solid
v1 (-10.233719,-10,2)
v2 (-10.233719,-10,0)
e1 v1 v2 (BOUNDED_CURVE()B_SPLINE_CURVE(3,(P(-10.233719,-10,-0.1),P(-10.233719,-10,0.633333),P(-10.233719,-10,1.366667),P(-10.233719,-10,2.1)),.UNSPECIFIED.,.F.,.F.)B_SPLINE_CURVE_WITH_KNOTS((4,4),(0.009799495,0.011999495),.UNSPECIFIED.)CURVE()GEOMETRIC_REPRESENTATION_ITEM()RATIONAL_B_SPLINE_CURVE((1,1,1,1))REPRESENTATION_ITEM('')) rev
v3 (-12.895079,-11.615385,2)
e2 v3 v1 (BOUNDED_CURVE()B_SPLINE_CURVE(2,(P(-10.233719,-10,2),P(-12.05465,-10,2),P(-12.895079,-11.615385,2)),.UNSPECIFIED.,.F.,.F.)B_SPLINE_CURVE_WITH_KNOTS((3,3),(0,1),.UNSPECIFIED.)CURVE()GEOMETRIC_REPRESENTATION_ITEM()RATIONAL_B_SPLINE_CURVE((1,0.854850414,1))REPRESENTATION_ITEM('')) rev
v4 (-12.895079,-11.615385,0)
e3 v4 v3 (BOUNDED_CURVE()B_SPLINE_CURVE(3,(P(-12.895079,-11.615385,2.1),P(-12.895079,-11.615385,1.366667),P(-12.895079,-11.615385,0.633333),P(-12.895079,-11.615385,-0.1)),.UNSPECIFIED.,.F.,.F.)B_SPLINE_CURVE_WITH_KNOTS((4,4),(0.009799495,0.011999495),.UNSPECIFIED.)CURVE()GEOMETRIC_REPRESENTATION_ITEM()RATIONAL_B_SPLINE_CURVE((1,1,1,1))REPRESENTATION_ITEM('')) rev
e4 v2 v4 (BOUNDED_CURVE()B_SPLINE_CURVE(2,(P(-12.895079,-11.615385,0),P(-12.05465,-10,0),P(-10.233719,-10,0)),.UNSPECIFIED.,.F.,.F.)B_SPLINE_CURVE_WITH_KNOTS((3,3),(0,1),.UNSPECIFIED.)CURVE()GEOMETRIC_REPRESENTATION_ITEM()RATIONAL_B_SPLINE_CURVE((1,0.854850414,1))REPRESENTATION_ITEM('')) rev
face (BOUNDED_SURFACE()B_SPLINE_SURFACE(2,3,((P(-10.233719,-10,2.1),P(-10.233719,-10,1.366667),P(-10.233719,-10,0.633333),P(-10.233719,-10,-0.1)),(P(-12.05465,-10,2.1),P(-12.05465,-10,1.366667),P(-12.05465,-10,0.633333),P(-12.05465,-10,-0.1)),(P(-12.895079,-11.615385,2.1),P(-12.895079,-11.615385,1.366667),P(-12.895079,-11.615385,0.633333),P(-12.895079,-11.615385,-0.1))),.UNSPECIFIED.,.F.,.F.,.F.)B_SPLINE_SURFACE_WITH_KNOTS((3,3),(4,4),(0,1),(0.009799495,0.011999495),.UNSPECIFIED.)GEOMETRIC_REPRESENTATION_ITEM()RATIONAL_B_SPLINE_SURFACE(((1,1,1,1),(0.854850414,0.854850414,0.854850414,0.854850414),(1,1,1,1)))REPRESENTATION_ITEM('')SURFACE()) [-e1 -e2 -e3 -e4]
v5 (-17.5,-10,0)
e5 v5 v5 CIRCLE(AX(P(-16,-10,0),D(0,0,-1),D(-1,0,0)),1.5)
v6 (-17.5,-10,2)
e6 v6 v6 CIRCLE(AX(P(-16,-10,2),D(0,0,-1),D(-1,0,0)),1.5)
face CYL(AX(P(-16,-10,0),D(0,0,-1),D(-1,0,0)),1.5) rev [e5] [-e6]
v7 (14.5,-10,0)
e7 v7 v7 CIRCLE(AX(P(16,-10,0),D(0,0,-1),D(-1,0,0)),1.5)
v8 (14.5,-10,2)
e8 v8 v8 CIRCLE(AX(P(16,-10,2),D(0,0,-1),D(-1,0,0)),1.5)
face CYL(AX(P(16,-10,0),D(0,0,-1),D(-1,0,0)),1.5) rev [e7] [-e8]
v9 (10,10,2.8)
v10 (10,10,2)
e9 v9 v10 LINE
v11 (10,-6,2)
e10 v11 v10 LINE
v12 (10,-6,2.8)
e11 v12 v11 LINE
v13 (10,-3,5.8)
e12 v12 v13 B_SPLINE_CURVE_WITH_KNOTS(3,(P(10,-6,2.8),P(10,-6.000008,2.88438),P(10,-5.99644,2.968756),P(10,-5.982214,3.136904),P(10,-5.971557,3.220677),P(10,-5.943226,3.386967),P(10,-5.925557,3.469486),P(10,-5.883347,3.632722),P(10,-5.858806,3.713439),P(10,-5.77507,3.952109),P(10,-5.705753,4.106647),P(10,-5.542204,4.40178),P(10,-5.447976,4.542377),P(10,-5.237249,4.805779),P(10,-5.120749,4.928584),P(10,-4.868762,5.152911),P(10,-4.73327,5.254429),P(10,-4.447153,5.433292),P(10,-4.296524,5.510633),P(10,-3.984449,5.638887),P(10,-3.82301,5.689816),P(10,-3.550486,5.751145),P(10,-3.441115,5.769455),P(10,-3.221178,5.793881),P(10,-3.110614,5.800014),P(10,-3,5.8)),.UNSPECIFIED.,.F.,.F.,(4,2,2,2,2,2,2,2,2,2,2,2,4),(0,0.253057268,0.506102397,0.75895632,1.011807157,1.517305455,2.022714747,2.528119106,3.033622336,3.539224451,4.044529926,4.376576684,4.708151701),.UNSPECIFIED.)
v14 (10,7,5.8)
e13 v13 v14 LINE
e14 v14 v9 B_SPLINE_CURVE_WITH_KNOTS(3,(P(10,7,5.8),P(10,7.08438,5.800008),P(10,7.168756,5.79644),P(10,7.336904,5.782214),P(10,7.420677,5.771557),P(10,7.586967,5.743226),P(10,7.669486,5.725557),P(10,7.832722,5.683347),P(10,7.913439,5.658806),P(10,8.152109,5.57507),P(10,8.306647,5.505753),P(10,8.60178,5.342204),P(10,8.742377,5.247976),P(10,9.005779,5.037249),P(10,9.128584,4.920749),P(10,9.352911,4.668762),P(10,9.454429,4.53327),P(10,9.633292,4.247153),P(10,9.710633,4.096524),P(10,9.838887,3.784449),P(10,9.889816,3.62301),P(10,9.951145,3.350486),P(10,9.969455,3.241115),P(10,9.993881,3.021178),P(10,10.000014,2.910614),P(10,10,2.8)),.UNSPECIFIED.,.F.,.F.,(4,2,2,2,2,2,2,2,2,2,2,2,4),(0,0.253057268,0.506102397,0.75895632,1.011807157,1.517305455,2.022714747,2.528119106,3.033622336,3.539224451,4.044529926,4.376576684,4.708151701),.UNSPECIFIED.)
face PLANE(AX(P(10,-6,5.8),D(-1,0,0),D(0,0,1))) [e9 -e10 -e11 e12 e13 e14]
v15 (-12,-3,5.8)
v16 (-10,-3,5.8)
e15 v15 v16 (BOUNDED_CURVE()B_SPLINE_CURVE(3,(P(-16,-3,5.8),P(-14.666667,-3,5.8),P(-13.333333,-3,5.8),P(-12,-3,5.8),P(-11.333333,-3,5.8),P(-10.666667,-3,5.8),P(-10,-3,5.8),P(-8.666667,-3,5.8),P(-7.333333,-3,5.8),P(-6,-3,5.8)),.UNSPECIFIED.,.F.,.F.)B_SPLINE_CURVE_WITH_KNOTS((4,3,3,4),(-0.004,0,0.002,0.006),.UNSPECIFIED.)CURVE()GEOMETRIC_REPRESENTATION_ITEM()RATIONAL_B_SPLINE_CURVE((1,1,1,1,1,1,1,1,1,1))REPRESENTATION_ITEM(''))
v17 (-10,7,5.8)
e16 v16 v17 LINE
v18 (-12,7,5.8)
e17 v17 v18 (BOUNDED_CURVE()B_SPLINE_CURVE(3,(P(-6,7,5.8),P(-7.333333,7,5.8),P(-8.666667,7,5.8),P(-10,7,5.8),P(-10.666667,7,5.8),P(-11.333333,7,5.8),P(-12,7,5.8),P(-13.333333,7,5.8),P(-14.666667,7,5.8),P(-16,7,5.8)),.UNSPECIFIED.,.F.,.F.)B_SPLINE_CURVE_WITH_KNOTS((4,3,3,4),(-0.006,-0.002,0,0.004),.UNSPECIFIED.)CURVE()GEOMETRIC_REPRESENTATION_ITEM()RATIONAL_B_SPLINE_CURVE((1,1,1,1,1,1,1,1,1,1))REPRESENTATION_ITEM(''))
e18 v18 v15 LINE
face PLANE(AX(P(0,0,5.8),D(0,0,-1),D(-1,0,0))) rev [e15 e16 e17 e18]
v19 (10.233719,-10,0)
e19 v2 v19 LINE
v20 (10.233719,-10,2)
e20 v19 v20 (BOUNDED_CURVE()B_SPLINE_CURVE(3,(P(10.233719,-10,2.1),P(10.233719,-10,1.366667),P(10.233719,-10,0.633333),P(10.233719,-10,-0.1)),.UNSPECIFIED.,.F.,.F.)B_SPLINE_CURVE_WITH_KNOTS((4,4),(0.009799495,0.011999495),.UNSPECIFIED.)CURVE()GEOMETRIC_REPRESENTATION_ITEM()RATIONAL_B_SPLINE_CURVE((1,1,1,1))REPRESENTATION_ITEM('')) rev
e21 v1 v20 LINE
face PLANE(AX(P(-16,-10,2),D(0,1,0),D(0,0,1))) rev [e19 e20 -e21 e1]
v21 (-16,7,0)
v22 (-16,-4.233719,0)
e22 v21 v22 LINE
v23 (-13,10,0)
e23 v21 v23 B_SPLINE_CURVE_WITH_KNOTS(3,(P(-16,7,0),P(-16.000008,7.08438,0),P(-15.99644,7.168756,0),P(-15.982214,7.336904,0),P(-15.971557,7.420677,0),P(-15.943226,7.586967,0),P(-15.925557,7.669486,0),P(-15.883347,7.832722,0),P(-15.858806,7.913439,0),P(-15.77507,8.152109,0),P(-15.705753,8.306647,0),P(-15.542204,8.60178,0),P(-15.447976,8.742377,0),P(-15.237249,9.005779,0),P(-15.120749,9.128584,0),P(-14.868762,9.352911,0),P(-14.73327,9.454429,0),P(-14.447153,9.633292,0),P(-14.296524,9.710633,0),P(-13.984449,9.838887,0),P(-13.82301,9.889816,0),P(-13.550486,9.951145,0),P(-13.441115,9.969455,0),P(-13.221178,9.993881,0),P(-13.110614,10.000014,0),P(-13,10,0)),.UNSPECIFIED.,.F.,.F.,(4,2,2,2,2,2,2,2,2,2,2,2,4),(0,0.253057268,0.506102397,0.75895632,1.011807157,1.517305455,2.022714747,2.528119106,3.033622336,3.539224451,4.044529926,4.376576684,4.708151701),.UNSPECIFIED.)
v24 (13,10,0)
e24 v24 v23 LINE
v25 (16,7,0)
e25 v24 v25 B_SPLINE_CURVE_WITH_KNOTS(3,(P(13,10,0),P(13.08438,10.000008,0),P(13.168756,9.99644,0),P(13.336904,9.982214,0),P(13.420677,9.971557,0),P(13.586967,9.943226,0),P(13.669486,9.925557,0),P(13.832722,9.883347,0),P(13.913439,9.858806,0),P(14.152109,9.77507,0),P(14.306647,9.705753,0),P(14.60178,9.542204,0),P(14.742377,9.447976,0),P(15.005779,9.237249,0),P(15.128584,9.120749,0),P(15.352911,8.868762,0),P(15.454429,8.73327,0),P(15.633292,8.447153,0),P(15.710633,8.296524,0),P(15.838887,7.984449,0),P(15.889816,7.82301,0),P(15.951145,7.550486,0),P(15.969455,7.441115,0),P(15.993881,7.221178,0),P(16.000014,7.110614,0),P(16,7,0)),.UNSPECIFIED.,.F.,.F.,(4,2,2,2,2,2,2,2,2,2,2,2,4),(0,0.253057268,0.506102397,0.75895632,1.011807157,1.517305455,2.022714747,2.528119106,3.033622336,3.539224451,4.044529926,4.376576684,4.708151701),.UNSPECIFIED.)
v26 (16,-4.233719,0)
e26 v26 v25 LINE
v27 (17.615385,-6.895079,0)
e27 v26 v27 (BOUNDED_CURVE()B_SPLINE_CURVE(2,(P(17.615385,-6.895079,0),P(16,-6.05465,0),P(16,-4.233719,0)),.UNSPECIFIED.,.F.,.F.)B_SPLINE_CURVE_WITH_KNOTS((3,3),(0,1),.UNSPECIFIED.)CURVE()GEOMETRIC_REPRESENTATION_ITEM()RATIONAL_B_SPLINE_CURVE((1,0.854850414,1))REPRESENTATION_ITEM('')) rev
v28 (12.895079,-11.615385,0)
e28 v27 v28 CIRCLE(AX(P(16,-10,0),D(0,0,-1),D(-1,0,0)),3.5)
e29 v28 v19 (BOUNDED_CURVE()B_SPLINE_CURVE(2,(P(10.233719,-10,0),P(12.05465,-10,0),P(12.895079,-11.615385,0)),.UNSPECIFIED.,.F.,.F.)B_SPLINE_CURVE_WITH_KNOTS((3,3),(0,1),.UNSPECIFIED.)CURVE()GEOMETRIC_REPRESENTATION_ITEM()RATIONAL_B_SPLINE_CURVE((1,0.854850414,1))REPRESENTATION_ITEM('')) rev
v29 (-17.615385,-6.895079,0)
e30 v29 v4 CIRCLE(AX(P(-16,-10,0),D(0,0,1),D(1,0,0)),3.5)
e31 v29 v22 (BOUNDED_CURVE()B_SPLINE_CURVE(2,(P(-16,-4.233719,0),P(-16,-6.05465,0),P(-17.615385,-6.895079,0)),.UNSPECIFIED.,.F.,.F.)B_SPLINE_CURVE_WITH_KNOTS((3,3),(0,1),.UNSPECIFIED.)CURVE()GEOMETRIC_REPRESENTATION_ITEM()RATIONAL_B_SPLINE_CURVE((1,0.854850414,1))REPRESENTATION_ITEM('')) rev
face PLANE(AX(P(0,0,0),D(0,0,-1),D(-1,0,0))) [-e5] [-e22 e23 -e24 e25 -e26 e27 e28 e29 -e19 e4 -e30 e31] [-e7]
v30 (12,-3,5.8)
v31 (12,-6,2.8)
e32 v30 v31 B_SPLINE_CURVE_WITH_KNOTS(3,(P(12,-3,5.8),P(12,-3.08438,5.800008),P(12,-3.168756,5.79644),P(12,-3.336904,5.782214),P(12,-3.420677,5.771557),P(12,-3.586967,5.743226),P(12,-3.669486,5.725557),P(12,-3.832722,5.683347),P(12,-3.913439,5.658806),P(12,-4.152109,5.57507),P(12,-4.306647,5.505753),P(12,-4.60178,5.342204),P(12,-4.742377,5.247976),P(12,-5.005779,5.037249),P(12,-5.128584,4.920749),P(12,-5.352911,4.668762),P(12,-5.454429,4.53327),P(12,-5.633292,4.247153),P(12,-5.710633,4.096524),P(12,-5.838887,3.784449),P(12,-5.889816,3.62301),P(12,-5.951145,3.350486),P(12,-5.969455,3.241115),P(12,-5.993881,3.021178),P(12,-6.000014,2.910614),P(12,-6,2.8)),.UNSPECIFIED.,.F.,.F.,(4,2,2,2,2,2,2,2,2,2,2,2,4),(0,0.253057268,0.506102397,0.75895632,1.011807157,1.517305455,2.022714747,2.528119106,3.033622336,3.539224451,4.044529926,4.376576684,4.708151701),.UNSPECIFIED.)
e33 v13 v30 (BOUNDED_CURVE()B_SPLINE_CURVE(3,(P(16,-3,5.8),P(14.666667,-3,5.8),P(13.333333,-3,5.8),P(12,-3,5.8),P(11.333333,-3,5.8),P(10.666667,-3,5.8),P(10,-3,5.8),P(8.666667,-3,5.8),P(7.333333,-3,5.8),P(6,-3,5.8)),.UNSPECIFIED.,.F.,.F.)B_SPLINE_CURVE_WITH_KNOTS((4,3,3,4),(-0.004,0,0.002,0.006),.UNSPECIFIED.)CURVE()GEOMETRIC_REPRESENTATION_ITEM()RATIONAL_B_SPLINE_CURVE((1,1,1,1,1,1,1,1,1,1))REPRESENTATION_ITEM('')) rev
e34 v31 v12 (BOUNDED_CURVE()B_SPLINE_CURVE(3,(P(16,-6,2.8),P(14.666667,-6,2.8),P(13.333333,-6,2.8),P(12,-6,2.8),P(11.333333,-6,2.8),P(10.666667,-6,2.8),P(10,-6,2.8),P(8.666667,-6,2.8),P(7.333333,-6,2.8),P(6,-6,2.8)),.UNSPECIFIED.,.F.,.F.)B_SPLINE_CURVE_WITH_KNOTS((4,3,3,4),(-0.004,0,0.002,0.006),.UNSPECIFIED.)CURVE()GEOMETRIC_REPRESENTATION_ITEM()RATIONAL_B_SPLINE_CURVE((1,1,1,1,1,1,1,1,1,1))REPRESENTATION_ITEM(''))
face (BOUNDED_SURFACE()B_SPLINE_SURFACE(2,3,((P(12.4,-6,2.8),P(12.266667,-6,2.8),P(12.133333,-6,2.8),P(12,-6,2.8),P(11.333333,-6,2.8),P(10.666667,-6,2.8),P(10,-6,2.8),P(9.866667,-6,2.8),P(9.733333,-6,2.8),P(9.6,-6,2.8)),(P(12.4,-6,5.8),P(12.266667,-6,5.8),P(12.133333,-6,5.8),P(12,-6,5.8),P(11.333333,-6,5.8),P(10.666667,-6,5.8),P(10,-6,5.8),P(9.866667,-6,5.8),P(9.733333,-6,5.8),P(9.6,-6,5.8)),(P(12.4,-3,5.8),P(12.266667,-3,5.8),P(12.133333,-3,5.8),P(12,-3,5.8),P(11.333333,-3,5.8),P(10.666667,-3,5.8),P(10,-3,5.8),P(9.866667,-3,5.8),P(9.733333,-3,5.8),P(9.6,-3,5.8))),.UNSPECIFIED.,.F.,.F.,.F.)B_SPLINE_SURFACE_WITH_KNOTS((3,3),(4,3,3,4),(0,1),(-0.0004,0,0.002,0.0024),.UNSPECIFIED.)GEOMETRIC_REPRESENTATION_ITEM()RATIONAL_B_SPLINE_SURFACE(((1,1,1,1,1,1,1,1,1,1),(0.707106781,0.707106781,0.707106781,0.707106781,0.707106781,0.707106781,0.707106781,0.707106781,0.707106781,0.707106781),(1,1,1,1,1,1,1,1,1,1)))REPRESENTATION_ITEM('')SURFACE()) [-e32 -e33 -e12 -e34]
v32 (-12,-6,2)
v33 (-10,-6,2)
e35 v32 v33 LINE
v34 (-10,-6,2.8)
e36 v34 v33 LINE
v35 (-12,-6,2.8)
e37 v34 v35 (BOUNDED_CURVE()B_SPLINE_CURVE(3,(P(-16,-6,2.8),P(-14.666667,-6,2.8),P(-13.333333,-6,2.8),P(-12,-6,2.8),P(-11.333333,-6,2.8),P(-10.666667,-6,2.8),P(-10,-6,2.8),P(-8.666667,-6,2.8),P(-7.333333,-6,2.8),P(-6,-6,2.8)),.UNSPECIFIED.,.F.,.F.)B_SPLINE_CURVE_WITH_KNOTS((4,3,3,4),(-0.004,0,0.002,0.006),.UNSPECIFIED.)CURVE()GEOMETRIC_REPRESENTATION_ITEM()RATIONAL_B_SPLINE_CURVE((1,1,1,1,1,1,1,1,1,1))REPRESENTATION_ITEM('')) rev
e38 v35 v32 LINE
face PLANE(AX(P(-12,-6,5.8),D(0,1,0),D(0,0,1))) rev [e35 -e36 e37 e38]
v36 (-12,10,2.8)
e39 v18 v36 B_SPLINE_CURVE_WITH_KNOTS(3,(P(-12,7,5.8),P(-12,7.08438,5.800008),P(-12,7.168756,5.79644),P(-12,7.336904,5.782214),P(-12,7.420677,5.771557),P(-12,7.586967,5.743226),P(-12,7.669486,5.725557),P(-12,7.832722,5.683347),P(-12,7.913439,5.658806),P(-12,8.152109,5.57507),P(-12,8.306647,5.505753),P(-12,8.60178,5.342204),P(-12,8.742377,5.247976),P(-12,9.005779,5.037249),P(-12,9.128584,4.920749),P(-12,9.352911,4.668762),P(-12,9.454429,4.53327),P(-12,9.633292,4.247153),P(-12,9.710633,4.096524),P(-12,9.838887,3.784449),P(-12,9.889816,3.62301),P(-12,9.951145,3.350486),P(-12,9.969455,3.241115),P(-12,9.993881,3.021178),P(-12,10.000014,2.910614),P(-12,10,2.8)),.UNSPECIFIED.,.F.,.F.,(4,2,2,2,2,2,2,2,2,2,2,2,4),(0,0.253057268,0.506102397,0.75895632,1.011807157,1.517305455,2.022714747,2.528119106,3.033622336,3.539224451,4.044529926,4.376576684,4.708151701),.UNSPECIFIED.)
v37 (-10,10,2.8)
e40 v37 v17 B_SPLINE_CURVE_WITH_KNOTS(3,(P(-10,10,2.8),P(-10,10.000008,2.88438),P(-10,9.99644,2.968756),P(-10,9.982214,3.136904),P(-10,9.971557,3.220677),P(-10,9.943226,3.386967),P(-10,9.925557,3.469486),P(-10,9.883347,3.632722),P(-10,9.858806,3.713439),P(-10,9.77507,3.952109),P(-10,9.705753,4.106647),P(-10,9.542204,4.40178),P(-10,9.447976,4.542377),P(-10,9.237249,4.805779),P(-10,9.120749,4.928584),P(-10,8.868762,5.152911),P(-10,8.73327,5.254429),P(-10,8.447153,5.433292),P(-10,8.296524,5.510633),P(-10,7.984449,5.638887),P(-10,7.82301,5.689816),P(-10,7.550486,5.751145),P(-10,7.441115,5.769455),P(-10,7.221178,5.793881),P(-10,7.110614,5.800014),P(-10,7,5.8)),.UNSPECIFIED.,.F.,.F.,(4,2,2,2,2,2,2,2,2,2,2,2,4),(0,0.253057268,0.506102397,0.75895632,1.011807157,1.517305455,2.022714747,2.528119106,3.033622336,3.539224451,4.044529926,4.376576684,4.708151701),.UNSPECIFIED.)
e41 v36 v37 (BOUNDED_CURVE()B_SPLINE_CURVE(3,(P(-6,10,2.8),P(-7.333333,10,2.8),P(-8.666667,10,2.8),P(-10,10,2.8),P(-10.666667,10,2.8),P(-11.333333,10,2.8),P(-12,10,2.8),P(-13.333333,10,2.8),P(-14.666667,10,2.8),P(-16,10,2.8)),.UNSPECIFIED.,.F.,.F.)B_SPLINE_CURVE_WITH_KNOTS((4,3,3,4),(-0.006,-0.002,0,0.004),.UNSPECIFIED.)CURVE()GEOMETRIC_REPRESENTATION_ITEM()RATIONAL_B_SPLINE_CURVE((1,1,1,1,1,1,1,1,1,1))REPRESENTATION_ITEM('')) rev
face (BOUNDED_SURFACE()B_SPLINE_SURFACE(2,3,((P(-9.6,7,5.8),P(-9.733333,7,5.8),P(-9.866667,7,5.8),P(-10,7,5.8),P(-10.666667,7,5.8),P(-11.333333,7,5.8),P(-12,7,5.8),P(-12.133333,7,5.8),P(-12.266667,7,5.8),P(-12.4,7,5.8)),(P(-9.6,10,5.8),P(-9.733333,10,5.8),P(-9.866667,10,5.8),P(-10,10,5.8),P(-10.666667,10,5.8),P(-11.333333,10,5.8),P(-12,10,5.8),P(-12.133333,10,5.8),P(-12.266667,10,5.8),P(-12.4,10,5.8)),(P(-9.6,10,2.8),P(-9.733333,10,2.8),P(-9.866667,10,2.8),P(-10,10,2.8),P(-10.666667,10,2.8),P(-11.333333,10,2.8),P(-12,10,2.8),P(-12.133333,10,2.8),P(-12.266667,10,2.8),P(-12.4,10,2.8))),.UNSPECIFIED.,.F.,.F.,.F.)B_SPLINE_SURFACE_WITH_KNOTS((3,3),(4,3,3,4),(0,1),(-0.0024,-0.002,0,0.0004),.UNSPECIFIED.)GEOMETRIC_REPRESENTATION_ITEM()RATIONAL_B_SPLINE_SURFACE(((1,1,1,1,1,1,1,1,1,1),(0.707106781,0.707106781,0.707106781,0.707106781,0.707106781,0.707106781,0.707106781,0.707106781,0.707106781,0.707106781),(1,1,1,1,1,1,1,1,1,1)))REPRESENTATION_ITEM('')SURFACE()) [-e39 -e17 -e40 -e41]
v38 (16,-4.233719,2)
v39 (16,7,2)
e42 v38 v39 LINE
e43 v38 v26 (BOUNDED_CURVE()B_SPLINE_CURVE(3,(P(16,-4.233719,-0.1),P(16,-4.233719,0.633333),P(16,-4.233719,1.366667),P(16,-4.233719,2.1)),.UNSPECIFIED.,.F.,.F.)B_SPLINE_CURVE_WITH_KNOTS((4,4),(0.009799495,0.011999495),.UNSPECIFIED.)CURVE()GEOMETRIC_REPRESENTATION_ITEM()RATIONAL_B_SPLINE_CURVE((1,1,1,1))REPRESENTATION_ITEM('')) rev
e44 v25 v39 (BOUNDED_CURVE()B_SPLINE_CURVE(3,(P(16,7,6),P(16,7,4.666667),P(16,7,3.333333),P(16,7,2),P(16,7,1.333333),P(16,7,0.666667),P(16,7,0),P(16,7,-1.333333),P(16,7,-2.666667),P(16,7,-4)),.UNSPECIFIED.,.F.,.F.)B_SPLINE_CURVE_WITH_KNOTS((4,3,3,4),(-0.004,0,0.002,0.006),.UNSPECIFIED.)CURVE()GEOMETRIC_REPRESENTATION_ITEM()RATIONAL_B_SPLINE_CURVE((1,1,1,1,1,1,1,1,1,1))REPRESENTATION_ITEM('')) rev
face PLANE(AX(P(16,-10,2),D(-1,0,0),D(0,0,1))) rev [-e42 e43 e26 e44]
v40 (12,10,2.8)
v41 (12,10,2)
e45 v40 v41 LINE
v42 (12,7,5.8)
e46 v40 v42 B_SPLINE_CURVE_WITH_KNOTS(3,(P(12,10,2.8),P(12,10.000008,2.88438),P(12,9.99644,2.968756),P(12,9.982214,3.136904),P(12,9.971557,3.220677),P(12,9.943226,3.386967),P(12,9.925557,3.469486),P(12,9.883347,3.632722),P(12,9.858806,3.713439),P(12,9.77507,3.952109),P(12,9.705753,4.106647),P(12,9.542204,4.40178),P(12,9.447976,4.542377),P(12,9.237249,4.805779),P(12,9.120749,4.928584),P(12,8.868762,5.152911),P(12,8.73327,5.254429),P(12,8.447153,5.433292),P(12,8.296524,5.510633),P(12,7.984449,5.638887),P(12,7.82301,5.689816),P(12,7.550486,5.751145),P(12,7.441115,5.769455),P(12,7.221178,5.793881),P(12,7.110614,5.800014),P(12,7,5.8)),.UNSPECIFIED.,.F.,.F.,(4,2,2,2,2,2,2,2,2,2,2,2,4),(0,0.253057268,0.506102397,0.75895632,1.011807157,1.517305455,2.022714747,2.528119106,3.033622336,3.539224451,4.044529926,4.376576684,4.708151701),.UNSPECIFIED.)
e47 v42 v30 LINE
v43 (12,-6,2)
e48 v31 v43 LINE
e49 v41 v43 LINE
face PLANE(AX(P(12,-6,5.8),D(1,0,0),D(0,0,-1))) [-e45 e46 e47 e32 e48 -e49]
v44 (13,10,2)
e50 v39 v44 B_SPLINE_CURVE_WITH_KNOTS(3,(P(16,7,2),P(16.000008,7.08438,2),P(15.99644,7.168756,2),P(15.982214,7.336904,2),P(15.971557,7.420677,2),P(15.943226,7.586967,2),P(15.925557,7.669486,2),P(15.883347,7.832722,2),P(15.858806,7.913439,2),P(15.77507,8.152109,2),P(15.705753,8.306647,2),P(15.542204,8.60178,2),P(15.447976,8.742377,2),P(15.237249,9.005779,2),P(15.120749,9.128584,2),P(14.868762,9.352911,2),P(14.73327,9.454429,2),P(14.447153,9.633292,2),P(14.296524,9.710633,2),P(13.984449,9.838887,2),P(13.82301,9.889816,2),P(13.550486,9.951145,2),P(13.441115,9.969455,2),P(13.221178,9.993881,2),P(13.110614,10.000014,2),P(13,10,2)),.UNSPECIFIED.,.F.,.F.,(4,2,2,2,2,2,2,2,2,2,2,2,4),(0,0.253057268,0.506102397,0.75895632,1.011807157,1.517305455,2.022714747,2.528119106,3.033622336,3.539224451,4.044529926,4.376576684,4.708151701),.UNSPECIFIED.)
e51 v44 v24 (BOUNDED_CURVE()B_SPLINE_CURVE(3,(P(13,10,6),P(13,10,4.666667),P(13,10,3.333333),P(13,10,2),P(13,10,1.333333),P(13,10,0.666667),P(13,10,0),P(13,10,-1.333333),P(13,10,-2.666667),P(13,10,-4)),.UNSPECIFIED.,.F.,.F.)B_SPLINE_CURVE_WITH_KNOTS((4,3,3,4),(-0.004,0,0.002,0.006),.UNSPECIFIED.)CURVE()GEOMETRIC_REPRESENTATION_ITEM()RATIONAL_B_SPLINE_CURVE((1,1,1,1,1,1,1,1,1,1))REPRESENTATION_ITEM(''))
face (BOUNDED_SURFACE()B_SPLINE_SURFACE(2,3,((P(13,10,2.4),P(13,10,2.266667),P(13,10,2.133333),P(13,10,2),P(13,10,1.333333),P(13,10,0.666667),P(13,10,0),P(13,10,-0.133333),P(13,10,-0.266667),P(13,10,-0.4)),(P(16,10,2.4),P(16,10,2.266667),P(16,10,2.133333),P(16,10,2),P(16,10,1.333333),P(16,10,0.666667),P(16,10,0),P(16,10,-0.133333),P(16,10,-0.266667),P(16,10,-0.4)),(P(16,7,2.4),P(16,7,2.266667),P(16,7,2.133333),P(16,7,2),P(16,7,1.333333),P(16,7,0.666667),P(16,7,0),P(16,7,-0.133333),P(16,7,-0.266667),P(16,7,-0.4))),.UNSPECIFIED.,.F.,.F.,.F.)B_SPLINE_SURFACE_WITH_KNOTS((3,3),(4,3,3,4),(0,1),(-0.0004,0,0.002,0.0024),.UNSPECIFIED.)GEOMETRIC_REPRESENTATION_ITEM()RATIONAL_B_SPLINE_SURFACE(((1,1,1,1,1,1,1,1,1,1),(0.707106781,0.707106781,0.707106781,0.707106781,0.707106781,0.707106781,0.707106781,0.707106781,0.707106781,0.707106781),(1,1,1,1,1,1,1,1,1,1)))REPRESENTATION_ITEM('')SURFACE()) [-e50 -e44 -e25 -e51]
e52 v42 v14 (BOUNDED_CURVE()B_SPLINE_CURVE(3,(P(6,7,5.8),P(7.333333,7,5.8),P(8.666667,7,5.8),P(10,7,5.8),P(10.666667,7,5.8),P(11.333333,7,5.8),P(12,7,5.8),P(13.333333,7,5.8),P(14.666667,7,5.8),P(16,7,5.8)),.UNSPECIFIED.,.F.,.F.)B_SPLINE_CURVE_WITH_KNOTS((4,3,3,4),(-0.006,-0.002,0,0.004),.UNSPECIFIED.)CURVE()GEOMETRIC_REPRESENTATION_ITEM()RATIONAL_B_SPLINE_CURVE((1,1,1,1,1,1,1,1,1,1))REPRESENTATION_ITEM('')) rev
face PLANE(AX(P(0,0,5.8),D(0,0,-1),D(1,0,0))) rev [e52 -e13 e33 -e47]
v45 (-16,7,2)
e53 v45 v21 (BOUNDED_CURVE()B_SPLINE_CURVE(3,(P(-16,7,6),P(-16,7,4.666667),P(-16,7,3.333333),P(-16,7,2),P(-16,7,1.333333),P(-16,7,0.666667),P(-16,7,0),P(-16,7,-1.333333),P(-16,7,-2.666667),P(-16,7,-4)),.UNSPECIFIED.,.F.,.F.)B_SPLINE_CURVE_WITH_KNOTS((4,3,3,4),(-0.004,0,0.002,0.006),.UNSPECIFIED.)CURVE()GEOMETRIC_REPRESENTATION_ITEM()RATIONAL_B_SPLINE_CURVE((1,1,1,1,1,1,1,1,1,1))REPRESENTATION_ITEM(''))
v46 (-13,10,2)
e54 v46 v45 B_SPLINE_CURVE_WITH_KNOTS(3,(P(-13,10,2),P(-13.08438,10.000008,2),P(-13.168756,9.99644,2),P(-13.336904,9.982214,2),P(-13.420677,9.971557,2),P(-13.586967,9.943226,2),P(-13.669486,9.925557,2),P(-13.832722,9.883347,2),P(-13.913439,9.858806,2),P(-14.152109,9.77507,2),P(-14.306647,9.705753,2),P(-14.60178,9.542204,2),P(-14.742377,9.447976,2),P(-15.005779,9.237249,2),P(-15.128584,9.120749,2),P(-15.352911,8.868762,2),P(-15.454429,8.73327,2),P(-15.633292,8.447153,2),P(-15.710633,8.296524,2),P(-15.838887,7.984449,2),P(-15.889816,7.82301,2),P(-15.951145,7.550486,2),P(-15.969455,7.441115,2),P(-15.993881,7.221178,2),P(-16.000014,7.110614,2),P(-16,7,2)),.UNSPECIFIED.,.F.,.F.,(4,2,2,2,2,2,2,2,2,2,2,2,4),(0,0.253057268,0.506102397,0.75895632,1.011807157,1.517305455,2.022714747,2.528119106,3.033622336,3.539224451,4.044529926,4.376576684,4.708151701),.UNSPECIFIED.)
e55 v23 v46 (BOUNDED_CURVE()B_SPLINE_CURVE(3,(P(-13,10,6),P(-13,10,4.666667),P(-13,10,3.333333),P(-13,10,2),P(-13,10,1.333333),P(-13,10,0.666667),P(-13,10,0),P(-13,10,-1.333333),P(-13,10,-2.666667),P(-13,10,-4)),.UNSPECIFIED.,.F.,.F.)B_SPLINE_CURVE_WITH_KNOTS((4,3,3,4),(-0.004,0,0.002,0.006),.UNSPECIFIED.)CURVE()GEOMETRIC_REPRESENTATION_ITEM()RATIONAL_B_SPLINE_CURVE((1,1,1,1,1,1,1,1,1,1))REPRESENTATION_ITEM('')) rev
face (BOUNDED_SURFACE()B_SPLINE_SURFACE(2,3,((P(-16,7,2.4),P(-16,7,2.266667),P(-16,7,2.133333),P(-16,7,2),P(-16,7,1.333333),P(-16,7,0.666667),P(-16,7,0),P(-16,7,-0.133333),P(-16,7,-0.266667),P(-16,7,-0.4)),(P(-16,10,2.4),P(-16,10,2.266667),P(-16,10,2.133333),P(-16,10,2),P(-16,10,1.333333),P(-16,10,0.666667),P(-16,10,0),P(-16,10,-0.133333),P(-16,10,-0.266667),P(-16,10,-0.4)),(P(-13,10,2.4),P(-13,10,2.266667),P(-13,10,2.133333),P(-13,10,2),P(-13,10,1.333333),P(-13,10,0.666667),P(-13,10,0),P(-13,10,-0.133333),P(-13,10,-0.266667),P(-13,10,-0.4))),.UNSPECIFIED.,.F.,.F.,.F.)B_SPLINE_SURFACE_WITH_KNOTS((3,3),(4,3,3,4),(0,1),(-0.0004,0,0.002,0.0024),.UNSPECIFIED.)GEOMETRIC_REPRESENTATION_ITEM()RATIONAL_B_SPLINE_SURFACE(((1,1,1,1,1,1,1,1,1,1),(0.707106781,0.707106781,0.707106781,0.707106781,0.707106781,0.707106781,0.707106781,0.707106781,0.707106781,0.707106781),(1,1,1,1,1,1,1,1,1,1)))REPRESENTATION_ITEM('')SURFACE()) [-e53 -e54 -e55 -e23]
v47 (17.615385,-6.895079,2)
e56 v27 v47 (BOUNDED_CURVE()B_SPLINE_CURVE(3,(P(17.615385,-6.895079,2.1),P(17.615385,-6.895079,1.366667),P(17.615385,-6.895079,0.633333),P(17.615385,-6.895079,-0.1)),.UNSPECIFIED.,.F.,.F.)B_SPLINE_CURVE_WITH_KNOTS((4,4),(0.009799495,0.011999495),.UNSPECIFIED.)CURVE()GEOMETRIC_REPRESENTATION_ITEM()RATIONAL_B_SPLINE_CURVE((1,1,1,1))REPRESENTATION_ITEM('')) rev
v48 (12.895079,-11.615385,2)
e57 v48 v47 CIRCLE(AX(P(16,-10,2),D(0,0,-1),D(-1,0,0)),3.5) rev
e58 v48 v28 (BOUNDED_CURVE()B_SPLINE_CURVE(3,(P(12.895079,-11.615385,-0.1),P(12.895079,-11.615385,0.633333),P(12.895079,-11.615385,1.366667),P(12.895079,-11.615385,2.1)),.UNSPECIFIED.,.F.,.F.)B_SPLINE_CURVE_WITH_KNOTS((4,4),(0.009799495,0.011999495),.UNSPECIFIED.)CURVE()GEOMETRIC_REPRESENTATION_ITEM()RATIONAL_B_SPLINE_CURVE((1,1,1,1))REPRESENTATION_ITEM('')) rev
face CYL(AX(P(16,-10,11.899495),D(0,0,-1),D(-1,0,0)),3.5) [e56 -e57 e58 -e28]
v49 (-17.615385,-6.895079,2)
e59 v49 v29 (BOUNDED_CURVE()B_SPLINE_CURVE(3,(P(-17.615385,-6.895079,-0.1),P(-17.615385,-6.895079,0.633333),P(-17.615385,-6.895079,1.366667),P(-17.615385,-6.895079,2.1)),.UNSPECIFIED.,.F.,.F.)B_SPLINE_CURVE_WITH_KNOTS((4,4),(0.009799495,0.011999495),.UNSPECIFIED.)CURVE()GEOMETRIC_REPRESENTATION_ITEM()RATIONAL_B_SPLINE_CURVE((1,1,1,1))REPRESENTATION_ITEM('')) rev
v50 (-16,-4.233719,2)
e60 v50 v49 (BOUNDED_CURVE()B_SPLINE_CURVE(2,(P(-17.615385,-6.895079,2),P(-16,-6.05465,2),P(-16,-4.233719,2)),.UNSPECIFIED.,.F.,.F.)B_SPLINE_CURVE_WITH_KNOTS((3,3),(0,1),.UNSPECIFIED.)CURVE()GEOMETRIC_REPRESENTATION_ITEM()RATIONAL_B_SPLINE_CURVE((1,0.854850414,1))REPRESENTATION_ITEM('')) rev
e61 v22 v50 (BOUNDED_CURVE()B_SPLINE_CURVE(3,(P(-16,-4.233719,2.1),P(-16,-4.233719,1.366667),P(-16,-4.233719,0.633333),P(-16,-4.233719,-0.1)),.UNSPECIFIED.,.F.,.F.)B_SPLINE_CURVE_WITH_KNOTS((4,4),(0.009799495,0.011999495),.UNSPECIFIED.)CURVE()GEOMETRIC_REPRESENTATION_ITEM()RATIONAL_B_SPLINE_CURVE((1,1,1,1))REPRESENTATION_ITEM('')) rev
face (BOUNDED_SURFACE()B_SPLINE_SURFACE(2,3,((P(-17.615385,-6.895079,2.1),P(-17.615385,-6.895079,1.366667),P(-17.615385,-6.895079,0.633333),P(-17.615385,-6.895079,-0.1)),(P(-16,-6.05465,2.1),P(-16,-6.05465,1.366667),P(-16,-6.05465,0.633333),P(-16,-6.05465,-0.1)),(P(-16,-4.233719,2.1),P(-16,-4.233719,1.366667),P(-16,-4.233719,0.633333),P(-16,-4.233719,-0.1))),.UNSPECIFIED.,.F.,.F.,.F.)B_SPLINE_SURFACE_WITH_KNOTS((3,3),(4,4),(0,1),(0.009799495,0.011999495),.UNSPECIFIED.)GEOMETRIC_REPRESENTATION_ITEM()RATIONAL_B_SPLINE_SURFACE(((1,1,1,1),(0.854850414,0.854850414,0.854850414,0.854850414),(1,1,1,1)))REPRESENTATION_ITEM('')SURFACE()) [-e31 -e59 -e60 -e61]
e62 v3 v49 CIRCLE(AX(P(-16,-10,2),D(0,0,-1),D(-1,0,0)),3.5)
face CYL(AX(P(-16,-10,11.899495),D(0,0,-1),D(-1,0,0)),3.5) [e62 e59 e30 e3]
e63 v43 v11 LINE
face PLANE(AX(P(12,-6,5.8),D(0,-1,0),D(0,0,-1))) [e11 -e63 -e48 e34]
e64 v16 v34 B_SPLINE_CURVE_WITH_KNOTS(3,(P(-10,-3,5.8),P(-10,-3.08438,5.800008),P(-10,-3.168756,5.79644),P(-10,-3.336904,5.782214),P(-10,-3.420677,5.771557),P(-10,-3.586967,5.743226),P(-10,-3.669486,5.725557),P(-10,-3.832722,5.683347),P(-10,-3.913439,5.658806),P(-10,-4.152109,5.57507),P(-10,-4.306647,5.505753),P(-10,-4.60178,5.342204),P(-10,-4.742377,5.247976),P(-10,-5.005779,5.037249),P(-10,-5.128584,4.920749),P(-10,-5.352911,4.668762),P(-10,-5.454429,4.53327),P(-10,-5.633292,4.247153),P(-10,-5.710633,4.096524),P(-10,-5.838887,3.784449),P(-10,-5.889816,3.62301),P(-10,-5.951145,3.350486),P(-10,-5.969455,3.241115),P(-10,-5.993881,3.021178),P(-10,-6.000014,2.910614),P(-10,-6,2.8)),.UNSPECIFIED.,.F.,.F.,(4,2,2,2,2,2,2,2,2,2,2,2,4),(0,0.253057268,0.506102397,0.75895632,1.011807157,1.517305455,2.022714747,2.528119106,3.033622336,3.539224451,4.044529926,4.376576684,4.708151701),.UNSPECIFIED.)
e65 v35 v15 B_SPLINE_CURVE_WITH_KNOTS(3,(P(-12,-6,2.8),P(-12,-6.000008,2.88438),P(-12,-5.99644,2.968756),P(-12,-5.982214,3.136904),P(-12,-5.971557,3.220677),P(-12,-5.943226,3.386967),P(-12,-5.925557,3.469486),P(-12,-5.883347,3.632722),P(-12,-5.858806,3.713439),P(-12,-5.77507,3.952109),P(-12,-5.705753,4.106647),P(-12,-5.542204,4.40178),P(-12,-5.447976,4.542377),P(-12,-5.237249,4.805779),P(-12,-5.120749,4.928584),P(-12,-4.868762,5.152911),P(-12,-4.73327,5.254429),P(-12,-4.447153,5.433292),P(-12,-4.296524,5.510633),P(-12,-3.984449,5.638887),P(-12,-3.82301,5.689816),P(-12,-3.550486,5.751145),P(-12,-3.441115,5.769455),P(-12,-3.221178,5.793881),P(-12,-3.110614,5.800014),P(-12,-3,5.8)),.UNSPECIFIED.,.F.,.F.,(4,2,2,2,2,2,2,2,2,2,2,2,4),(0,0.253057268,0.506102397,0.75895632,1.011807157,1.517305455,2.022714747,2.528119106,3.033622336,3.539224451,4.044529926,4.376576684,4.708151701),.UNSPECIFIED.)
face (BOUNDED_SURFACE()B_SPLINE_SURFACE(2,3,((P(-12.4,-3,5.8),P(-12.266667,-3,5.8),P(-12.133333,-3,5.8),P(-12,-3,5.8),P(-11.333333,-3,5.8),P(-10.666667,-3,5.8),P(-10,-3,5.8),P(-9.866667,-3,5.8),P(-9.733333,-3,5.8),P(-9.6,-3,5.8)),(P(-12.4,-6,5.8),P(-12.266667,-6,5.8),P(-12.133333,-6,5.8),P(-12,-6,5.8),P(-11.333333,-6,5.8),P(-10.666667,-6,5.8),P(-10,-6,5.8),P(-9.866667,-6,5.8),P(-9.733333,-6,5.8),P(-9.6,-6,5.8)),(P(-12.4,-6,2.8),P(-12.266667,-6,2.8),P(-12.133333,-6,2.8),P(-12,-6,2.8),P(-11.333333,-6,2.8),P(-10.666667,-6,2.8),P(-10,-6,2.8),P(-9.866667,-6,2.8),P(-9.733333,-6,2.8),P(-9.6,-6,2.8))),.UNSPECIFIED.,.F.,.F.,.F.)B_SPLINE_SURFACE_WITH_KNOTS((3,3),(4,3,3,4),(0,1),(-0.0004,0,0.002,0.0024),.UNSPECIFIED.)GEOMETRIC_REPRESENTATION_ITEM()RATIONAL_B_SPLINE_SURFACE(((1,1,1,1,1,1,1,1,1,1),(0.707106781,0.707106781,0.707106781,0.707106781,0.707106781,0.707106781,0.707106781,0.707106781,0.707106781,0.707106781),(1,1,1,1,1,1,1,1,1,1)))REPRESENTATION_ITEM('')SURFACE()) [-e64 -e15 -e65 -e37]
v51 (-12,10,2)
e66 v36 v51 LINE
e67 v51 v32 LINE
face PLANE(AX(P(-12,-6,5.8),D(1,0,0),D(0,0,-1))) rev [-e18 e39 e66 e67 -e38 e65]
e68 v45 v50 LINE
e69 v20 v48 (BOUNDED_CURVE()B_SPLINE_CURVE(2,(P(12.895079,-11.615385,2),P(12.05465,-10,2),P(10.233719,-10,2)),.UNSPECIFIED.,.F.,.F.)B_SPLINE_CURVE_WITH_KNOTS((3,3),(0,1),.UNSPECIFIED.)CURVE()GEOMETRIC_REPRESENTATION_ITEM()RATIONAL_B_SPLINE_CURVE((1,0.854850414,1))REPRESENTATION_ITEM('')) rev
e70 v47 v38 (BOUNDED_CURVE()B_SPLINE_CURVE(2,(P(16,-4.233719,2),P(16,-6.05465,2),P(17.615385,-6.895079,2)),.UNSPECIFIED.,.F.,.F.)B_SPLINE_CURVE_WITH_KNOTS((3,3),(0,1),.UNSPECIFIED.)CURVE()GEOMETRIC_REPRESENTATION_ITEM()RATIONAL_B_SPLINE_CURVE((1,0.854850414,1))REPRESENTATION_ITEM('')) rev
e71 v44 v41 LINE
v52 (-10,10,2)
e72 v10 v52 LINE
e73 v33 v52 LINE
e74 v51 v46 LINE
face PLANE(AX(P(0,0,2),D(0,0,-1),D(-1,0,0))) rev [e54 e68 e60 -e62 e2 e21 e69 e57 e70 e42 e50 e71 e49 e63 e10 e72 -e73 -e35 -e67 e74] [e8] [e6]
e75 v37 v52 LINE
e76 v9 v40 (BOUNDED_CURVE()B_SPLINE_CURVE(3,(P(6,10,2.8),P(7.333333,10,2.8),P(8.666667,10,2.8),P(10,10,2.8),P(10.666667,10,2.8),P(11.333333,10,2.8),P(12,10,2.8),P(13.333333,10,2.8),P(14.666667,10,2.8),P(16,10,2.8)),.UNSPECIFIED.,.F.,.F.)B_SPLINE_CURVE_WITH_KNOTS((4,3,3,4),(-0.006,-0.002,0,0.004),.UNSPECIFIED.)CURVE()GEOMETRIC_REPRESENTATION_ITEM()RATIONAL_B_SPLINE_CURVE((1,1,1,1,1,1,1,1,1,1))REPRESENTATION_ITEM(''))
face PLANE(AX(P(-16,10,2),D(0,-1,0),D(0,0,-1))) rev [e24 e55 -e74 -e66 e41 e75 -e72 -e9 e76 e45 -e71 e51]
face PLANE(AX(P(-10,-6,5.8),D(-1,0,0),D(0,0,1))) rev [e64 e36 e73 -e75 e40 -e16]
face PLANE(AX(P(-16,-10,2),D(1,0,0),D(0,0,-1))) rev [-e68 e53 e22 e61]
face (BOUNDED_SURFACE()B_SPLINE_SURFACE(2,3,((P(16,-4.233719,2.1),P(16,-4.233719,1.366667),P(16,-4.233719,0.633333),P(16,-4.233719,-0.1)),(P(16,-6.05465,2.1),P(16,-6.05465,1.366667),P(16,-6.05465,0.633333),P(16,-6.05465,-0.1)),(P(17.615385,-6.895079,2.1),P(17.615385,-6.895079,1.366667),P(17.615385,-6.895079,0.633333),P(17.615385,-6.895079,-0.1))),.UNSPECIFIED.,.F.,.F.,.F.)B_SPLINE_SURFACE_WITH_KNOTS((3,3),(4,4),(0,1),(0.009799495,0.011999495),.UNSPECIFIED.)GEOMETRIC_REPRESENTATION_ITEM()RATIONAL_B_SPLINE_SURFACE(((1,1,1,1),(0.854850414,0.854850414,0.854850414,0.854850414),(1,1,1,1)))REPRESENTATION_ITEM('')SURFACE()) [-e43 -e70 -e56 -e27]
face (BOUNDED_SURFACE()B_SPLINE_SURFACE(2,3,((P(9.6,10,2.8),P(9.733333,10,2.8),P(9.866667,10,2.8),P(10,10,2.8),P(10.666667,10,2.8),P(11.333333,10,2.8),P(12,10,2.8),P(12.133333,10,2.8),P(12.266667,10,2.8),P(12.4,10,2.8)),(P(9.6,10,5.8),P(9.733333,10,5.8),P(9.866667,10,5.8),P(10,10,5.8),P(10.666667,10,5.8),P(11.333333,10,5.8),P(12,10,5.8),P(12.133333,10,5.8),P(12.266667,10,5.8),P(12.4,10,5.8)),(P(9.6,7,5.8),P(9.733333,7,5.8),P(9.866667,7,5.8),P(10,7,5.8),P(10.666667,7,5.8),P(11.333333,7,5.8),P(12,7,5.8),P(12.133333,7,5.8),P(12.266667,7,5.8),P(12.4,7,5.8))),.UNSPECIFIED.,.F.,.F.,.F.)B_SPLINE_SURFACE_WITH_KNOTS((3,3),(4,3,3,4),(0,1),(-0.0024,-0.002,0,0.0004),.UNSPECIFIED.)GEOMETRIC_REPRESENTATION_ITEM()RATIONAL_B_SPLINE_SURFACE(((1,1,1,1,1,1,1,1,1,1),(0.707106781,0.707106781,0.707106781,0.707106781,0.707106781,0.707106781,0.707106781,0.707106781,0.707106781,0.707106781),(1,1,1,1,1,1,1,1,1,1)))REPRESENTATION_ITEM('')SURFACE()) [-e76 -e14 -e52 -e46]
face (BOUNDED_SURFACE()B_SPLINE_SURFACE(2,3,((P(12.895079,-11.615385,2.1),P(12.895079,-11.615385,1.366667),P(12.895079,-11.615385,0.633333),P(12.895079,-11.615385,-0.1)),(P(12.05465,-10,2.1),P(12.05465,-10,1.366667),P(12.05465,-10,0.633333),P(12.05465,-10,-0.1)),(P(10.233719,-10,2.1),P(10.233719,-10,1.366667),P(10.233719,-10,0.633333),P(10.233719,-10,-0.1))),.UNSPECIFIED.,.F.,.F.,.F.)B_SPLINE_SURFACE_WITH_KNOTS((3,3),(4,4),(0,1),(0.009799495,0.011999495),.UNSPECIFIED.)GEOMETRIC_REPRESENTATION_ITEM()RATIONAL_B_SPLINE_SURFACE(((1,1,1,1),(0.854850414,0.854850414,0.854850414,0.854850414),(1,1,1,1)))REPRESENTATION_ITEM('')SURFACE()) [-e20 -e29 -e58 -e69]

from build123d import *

# Parameters (mm, degrees)
SKETCH_1_W            = 32
SKETCH_1_H            = 20
EXTRUDE_1_DEPTH       = 2
SKETCH_2_R            = 3.5
EXTRUDE_2_DEPTH       = 2
HOLE_WIZARD_3_0_3_1_D = 3
SKETCH_5_W            = 2
SKETCH_5_H            = 16
EXTRUDE_3_DEPTH       = 3.8
FILLET_1_DEPTH        = 2
FILLET_START          = -1
FILLET_1_2_DEPTH      = 6.8
FILLET_START_2        = -12
FILLET_1_3_DEPTH      = 24


with BuildPart() as part:
    # 草圖1 → 填料-伸長1 (new body)
    with BuildSketch(Plane.XY):
        Rectangle(SKETCH_1_W, SKETCH_1_H)
    extrude(amount=EXTRUDE_1_DEPTH)

    # 草圖2 → 填料-伸長2 (add)
    with BuildSketch(Plane(origin=(0, 0, 0), x_dir=(-1, 0, 0), z_dir=(0, 0, -1))):
        with Locations((-16, -10)):
            Circle(SKETCH_2_R)
    extrude_2 = extrude(amount=-EXTRUDE_2_DEPTH)

    # Ø3.0 (3) 直徑孔1 (through all)
    with Locations(Plane(origin=(0, 0, 0), x_dir=(-1, 0, 0), z_dir=(0, 0, -1))):
        with Locations((-16, -10)):
            hole_wizard_3_0_3_1 = Hole(HOLE_WIZARD_3_0_3_1_D / 2)

    # 鏡射1: 填料-伸長2, Ø3.0 (3) 直徑孔1 across plane
    add(extrude_2.mirror(Plane(origin=(0, 0, 0), x_dir=(0, 0, 1), z_dir=(1, 0, 0))))
    add(hole_wizard_3_0_3_1.mirror(Plane(origin=(0, 0, 0), x_dir=(0, 0, 1), z_dir=(1, 0, 0))), mode=Mode.SUBTRACT)

    # 草圖5 → 填料-伸長3 (add)
    with BuildSketch(Plane.XY.offset(2)):
        with Locations((-11, 2)):
            Rectangle(SKETCH_5_W, SKETCH_5_H)
    extrude_3 = extrude(amount=EXTRUDE_3_DEPTH)

    # 鏡射2: 填料-伸長3 across plane
    add(extrude_3.mirror(Plane(origin=(0, 0, 0), x_dir=(0, 0, 1), z_dir=(1, 0, 0))))

    # 圓角1: read off the stored shape, not the designer's step
    # 圓角1 outline → 圓角1 (add)
    with BuildSketch(Plane.XY):
        with BuildLine():
            add(Edge.make_bspline(
                [(-17.615384615, -6.895079301), (-16, -6.054649639), (-16, -4.233718703)],
                knots=[0, 0, 0, 1, 1, 1], degree=2, weights=[1, 0.854850414, 1]))
            ThreePointArc((-17.615384615, -6.895079301), (-16.831497912, -6.600204238), (-16, -6.5))
            Line((-16, -6.5), (-16, -4.233718703))
        make_face()
        with BuildLine():
            ThreePointArc((-12.5, -10), (-12.600204238, -10.831497912), (-12.895079301, -11.615384615))
            add(Edge.make_bspline(
                [(-10.233718703, -10), (-12.054649639, -10), (-12.895079301, -11.615384615)],
                knots=[0, 0, 0, 1, 1, 1], degree=2, weights=[1, 0.854850414, 1]))
            Line((-10.233718703, -10), (-12.5, -10))
        make_face()
        with BuildLine():
            Line((12.5, -10), (10.233718703, -10))
            add(Edge.make_bspline(
                [(12.895079301, -11.615384615), (12.054649639, -10), (10.233718703, -10)],
                knots=[0, 0, 0, 1, 1, 1], degree=2, weights=[1, 0.854850414, 1]))
            ThreePointArc((12.895079301, -11.615384615), (12.600204238, -10.831497912), (12.5, -10))
        make_face()
        with BuildLine():
            ThreePointArc((16, -6.5), (16.831497912, -6.600204238), (17.615384615, -6.895079301))
            add(Edge.make_bspline(
                [(16, -4.233718703), (16, -6.054649639), (17.615384615, -6.895079301)],
                knots=[0, 0, 0, 1, 1, 1], degree=2, weights=[1, 0.854850414, 1]))
            Line((16, -4.233718703), (16, -6.5))
        make_face()
    extrude(amount=FILLET_1_DEPTH)

    # Fillet 1 2 outline → Fillet 1 2 (cut)
    with BuildSketch(Plane.XY.offset(FILLET_START)):
        with BuildLine():
            Line((-16, 10), (-16, 7))
            add(Edge.make_bspline(
                [(-16, 7), (-16, 10), (-13, 10)],
                knots=[0, 0, 0, 1, 1, 1], degree=2, weights=[1, 0.707106781, 1]))
            Line((-13, 10), (-16, 10))
        make_face()
        with BuildLine():
            add(Edge.make_bspline(
                [(13, 10), (16, 10), (16, 7)],
                knots=[0, 0, 0, 1, 1, 1], degree=2, weights=[1, 0.707106781, 1]))
            Line((16, 7), (16, 10))
            Line((16, 10), (13, 10))
        make_face()
    extrude(amount=FILLET_1_2_DEPTH, mode=Mode.SUBTRACT)

    # Fillet 1 3 outline → Fillet 1 3 (cut)
    with BuildSketch(Plane.YZ.offset(FILLET_START_2)):
        with BuildLine():
            add(Edge.make_bspline(
                [(10, 2.8), (10, 5.8), (7, 5.8)],
                knots=[0, 0, 0, 1, 1, 1], degree=2, weights=[1, 0.707106781, 1]))
            Line((10, 2.8), (10, 5.8))
            Line((10, 5.8), (7, 5.8))
        make_face()
        with BuildLine():
            add(Edge.make_bspline(
                [(-6, 2.8), (-6, 5.8), (-3, 5.8)],
                knots=[0, 0, 0, 1, 1, 1], degree=2, weights=[1, 0.707106781, 1]))
            Line((-3, 5.8), (-6, 5.8))
            Line((-6, 5.8), (-6, 2.8))
        make_face()
    extrude(amount=FILLET_1_3_DEPTH, mode=Mode.SUBTRACT)


solid = part.part
